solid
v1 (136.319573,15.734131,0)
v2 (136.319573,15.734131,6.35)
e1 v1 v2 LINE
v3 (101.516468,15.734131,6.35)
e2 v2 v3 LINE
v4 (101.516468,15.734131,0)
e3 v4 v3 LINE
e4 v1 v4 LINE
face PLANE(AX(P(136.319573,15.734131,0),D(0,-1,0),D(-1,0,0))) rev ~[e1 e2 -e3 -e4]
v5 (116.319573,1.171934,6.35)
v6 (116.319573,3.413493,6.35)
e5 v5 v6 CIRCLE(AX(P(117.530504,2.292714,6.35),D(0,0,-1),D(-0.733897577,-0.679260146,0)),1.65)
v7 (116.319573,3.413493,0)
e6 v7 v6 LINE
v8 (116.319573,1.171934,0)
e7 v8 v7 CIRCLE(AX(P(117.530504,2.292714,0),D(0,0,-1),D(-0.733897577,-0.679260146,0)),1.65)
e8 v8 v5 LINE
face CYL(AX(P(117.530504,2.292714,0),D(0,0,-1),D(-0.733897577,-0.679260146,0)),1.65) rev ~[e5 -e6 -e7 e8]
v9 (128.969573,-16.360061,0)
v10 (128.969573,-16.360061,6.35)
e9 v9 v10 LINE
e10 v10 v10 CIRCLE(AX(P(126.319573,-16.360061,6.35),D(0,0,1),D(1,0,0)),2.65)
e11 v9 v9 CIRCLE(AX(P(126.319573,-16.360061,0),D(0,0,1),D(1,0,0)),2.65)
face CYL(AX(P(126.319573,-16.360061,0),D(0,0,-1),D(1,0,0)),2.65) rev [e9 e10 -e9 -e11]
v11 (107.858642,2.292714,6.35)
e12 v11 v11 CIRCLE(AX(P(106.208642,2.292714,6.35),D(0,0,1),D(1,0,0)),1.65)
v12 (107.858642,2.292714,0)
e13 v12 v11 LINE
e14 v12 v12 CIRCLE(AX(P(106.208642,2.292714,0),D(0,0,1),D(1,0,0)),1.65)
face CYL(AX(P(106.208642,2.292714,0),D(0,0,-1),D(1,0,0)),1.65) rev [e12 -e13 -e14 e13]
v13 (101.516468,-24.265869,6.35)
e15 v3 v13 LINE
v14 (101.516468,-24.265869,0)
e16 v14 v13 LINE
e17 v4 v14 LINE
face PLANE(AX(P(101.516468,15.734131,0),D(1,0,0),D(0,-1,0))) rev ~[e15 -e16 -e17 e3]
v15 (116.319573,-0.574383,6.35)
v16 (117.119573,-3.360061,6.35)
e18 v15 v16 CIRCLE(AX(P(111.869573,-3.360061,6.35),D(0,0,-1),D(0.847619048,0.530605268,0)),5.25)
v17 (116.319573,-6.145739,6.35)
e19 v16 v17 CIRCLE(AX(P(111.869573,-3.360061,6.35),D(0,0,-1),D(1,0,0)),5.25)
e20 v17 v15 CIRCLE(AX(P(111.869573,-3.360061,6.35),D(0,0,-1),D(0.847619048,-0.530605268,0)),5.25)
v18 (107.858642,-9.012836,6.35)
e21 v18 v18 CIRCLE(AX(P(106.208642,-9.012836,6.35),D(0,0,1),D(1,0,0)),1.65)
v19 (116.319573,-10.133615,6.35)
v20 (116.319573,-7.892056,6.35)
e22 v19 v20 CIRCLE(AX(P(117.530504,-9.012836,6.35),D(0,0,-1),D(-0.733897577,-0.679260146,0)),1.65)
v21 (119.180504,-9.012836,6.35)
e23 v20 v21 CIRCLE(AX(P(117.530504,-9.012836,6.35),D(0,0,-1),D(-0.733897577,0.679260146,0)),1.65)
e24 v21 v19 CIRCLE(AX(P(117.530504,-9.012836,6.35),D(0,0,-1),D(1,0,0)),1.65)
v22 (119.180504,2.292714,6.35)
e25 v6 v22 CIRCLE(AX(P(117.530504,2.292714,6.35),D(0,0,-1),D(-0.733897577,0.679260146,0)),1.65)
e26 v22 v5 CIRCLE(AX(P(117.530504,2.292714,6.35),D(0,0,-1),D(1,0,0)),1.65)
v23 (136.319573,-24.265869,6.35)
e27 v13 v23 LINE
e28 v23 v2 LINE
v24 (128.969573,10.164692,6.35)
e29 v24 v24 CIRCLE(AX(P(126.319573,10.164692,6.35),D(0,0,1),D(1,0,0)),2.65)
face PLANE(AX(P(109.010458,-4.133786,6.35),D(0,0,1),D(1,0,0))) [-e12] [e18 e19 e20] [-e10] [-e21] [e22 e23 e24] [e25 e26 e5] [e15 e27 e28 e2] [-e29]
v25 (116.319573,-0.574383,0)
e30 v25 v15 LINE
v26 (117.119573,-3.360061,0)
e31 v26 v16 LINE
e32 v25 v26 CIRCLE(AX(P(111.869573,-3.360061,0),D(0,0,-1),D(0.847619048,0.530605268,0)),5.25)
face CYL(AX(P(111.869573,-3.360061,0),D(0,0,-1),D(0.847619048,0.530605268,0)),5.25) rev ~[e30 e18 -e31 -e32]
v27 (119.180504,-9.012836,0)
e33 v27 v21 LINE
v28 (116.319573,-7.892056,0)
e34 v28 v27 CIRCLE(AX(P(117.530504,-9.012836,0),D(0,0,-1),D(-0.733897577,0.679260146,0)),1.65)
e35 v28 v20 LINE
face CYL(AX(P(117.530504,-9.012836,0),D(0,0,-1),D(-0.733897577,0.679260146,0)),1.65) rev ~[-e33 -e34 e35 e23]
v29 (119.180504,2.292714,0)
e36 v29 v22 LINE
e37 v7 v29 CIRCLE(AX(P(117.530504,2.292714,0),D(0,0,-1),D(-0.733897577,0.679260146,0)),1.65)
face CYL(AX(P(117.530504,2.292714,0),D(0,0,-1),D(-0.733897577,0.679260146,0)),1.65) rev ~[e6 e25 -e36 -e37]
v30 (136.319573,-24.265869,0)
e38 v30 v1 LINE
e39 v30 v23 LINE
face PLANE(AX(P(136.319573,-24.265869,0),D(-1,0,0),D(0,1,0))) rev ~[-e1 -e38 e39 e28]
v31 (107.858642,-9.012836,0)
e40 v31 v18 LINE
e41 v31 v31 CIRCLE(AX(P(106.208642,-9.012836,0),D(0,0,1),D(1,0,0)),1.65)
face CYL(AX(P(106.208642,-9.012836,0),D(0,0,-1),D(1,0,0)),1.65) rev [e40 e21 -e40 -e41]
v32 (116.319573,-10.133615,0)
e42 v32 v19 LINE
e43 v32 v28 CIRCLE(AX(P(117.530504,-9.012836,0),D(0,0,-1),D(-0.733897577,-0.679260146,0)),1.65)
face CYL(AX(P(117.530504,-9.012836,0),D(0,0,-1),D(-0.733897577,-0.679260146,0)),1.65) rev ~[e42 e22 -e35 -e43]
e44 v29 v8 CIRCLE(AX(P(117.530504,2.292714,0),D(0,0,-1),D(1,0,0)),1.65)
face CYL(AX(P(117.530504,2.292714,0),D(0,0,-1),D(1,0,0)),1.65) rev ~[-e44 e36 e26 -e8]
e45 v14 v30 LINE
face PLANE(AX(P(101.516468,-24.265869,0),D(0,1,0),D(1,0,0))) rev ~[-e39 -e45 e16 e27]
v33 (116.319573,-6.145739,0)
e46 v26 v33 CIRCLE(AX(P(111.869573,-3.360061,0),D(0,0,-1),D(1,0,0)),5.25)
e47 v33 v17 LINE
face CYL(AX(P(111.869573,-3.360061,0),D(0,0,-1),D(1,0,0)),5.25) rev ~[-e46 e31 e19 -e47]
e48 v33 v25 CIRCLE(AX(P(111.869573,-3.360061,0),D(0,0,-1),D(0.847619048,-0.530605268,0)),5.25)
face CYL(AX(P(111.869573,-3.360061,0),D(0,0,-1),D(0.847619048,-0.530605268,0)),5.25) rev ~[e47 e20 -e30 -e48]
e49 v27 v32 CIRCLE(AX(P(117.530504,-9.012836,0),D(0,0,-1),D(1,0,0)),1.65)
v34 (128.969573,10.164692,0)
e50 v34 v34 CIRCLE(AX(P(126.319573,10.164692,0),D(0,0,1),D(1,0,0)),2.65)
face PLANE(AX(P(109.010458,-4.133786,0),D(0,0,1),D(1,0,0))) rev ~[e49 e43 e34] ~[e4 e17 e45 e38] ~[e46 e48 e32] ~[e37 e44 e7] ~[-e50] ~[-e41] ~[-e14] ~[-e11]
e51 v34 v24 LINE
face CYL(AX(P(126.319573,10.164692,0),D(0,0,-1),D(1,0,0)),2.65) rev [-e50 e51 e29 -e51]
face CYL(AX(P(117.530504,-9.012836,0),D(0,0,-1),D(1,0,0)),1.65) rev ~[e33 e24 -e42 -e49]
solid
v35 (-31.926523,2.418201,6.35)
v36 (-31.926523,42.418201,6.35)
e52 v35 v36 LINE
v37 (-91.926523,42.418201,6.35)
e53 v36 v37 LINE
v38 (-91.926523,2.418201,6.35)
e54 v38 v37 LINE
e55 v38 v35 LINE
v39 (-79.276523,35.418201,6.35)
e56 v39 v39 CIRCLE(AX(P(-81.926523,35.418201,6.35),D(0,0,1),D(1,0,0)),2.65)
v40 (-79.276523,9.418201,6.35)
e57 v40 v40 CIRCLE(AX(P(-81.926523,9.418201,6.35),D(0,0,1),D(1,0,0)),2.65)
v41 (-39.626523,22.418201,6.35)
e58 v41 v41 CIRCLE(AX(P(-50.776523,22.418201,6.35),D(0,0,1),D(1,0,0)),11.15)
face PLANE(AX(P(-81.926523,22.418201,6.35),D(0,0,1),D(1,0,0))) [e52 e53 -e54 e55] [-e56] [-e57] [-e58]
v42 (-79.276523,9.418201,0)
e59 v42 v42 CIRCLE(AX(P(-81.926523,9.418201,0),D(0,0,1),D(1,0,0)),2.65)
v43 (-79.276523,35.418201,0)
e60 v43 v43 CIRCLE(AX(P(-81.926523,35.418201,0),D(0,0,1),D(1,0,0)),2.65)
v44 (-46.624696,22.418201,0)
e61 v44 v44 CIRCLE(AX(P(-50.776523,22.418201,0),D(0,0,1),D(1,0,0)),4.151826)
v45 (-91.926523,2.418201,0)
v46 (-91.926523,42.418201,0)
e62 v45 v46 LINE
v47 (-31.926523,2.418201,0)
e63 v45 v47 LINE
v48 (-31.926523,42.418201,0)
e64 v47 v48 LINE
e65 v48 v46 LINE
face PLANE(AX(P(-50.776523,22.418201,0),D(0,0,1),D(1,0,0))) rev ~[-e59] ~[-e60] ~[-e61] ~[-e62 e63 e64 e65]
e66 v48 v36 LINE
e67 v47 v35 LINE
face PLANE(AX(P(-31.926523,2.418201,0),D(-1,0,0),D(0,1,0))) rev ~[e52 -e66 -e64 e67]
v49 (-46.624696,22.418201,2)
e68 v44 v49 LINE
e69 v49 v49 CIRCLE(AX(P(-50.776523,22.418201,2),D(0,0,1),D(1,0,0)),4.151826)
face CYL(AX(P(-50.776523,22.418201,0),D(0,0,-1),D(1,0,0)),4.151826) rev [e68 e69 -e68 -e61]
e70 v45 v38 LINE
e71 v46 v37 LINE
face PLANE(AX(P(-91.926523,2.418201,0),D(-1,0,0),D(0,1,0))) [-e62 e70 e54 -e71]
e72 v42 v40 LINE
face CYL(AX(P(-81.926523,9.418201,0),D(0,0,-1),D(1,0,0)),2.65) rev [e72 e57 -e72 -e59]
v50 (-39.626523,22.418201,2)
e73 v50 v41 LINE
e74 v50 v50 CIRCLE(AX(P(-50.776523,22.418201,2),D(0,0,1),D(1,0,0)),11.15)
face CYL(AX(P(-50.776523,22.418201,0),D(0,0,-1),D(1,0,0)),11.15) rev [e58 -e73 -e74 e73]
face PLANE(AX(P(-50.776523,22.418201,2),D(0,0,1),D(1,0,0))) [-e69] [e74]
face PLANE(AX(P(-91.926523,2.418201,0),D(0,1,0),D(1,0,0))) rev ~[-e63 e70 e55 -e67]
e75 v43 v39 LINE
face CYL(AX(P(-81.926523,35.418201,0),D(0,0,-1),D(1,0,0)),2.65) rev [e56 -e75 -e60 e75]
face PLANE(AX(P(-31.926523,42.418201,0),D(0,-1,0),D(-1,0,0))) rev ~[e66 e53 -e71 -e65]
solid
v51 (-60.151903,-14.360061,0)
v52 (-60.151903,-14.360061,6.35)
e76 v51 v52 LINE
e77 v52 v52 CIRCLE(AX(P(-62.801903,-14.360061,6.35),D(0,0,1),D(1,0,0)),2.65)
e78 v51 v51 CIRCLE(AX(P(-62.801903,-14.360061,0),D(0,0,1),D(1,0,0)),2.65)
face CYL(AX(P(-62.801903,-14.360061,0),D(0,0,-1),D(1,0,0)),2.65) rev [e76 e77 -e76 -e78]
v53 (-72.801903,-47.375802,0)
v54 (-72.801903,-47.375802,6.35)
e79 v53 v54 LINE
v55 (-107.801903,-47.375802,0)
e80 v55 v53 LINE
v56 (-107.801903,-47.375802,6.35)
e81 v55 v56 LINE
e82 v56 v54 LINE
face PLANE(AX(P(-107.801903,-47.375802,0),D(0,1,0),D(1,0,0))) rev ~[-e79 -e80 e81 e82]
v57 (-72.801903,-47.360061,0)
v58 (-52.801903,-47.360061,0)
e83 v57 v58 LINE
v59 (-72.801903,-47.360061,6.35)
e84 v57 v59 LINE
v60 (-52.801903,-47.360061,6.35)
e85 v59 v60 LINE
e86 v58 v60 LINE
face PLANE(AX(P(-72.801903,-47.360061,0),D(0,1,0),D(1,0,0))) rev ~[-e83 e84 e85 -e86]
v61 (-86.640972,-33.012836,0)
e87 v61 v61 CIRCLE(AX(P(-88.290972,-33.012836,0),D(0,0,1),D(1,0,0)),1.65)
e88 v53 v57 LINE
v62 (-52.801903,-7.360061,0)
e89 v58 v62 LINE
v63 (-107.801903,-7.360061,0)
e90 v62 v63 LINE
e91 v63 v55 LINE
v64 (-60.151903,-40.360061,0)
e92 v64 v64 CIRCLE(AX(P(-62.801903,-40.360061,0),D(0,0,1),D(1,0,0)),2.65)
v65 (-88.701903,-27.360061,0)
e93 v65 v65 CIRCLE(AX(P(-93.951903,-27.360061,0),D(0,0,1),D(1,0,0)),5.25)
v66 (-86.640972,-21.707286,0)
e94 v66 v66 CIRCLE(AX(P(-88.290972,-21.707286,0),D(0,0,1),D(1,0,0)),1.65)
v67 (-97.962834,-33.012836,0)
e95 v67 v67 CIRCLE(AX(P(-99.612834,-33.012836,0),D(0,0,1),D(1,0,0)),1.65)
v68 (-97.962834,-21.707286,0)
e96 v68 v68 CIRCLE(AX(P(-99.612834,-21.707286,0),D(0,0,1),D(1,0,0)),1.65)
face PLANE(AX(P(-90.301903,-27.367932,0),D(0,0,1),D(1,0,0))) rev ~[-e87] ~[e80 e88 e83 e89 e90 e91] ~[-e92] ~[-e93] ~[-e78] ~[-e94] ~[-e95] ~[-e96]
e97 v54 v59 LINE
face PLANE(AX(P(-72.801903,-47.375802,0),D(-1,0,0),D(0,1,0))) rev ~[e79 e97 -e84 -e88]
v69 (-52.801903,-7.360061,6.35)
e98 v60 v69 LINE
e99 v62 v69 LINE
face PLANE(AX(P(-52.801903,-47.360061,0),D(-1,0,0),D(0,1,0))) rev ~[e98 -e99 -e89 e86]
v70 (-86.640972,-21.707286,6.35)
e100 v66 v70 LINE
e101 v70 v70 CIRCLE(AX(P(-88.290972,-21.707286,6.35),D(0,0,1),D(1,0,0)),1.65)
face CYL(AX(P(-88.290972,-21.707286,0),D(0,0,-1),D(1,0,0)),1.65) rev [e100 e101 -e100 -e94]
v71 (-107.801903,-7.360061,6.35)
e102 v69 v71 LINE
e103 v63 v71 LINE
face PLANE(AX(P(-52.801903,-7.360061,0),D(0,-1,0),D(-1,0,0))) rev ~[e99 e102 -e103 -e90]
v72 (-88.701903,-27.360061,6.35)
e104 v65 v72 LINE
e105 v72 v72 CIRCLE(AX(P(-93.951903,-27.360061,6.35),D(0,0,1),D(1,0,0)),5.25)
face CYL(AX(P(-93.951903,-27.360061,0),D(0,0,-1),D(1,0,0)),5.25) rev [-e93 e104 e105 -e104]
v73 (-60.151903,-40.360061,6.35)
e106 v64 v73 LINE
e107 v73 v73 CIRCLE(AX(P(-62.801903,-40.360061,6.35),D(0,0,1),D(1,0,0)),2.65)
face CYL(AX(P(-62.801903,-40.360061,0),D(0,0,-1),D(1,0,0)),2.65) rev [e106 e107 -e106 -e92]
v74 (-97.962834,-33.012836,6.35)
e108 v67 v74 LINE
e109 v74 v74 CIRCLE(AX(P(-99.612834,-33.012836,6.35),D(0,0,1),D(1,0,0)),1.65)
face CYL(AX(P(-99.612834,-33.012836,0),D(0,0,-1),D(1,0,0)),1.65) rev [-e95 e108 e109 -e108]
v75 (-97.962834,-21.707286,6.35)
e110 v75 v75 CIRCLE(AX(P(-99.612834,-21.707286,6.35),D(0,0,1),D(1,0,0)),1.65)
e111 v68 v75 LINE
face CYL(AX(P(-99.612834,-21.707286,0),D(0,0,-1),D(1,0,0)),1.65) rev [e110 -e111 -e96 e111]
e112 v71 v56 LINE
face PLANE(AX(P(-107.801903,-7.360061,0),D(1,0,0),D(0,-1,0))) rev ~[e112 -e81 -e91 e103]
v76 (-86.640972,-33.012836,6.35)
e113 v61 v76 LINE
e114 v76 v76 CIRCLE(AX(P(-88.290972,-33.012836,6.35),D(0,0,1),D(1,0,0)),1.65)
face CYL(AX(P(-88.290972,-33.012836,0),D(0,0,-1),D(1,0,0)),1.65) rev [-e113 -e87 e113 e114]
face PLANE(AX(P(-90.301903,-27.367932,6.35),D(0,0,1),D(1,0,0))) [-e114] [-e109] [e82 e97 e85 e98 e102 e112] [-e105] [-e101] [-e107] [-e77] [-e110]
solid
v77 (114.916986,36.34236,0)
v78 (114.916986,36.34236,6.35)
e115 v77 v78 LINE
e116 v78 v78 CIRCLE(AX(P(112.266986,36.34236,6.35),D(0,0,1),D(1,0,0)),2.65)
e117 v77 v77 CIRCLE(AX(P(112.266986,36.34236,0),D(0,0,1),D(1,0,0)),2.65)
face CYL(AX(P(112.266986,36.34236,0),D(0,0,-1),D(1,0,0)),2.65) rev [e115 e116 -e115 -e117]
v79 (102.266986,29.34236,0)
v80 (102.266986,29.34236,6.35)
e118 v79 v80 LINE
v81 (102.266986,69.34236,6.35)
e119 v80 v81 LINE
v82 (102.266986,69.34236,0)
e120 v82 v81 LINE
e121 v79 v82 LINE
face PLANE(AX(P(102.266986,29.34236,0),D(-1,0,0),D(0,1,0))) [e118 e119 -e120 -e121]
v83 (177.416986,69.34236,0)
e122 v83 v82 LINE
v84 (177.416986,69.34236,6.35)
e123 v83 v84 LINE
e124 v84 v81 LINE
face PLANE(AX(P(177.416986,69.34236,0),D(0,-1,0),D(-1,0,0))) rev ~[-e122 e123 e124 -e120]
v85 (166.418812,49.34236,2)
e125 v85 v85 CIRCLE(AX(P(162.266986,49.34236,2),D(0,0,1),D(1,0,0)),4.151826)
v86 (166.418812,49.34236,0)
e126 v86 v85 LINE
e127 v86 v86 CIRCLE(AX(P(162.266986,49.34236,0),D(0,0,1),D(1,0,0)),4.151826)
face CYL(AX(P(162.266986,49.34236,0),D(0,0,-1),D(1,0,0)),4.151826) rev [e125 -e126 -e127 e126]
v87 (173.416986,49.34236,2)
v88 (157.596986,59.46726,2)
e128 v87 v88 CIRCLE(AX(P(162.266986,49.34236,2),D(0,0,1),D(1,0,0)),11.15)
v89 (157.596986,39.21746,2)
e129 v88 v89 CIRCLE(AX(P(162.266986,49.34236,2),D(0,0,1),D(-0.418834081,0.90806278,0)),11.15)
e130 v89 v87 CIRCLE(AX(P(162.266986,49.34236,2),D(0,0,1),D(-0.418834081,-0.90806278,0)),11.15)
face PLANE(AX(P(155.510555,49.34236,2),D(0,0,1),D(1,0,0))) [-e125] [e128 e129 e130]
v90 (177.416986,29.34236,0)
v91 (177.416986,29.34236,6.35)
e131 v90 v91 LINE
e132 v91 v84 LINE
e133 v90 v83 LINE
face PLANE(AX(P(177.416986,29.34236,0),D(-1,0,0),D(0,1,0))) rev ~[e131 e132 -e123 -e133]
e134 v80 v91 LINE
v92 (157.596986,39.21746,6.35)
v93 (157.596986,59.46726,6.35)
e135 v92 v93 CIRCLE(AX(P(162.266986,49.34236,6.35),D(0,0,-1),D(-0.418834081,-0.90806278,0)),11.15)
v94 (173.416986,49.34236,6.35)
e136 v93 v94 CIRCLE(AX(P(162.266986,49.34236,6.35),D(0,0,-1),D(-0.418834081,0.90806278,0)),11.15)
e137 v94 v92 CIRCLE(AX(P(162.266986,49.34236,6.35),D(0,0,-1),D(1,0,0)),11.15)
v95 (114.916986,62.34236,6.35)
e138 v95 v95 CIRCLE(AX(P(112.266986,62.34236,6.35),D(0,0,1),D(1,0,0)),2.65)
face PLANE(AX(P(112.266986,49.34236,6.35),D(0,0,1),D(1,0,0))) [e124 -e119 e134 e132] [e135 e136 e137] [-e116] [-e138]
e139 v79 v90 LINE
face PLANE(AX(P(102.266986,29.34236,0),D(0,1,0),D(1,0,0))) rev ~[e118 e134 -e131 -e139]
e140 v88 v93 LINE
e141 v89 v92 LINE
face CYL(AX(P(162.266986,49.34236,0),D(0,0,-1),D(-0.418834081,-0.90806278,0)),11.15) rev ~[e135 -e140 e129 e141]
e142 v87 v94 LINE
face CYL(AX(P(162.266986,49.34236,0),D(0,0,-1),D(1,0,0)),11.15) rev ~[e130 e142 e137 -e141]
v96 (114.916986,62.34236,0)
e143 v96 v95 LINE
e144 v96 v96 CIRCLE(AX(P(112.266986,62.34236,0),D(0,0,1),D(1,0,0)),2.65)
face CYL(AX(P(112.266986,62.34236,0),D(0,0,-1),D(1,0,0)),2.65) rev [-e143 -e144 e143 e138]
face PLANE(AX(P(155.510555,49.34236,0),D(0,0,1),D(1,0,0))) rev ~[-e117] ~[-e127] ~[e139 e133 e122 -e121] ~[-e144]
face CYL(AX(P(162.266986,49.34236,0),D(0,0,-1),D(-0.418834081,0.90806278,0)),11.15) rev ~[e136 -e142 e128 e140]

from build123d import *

# Parameters (mm, degrees)
F1_R     = 1.65
F1_R_2   = 5.25
F1_W     = 20
F1_H     = 40
F1_R_3   = 2.65
F2_DEPTH = 6.35
F0_W     = 20
F0_H     = 40
F0_R     = 2.65
F0_W_2   = 40
F0_R_2   = 11.15
F3_DEPTH = 6.35
F0_R_3   = 4.1518260948
F4_DEPTH = 2


# Not quite as in the source:
# - a feature names something its author has since deleted; it is built from what else it names


with BuildPart() as f2:
    # F1 (on Top) → F2 (new body)
    with BuildSketch(Plane.XY):
        Polygon((-72.8019029178, -47.3758022127), (-72.8019029178, -47.3600610539), (-72.8019029178, -7.3600610539), (-102.8019029178, -7.3600610539), (-107.8019029178, -7.3600610539), (-107.8019029178, -47.3758022127), (-102.8956038096, -47.3758022127), align=None)
        with Locations((-99.6128339202, -33.0128356103)):
            Circle(F1_R, mode=Mode.SUBTRACT)
        with Locations((-88.2909719153, -33.0128356103)):
            Circle(F1_R, mode=Mode.SUBTRACT)
        with Locations((-93.9519029178, -27.3600610539)):
            Circle(F1_R_2, mode=Mode.SUBTRACT)
        with Locations((-99.6128339202, -21.7072864974)):
            Circle(F1_R, mode=Mode.SUBTRACT)
        with Locations((-88.2909719153, -21.7072864974)):
            Circle(F1_R, mode=Mode.SUBTRACT)
        with Locations((-62.8019029178, -27.3600610539)):
            Rectangle(F1_W, F1_H)
        with Locations((-62.8019029178, -40.3600610539)):
            Circle(F1_R_3, mode=Mode.SUBTRACT)
        with Locations((-62.8019029178, -14.3600610539)):
            Circle(F1_R_3, mode=Mode.SUBTRACT)
    extrude(amount=F2_DEPTH)


with BuildPart() as f2b:
    # F1 (on Top) → F2, piece 2 (new body)
    with BuildSketch(Plane.XY):
        with BuildLine():
            Line((101.5164678693, -24.2658690363), (116.3195730567, -24.2658690363))
            Line((116.3195730567, -24.2658690363), (116.3195730567, -10.1336148514))
            ThreePointArc((116.3195730567, -10.1336148514), (115.8805040591, -9.0128356103), (116.3195730567, -7.8920563691))
            Line((116.3195730567, -7.8920563691), (116.3195730567, -6.1457387093))
            ThreePointArc((116.3195730567, -6.1457387093), (106.6195730567, -3.3600610539), (116.3195730567, -0.5743833984))
            Line((116.3195730567, -0.5743833984), (116.3195730567, 1.1719342614))
            ThreePointArc((116.3195730567, 1.1719342614), (115.8805040591, 2.2927135026), (116.3195730567, 3.4134927437))
            Line((116.3195730567, 3.4134927437), (116.3195730567, 15.7341309637))
            Line((116.3195730567, 15.7341309637), (101.5164678693, 15.7341309637))
            Line((101.5164678693, 15.7341309637), (101.5164678693, -24.2658690363))
        make_face()
        with Locations((106.2086420543, -9.0128356103)):
            Circle(F1_R, mode=Mode.SUBTRACT)
        with Locations((106.2086420543, 2.2927135026)):
            Circle(F1_R, mode=Mode.SUBTRACT)
        with BuildLine():
            Line((116.3195730567, -24.2658690363), (136.3195730567, -24.2658690363))
            Line((136.3195730567, -24.2658690363), (136.3195730567, 15.7341309637))
            Line((136.3195730567, 15.7341309637), (116.3195730567, 15.7341309637))
            Line((116.3195730567, 15.7341309637), (116.3195730567, 3.4134927437))
            ThreePointArc((116.3195730567, 3.4134927437), (118.1323611211, 3.8290299013), (119.1805040591, 2.2927135026))
            ThreePointArc((119.1805040591, 2.2927135026), (118.1323611211, 0.7563971038), (116.3195730567, 1.1719342614))
            Line((116.3195730567, 1.1719342614), (116.3195730567, -0.5743833984))
            ThreePointArc((116.3195730567, -0.5743833984), (116.9156111065, -1.9109233792), (117.1195730567, -3.3600610539))
            ThreePointArc((117.1195730567, -3.3600610539), (116.9156111065, -4.8091987285), (116.3195730567, -6.1457387093))
            Line((116.3195730567, -6.1457387093), (116.3195730567, -7.8920563691))
            ThreePointArc((116.3195730567, -7.8920563691), (118.1323611211, -7.4765192115), (119.1805040591, -9.0128356103))
            ThreePointArc((119.1805040591, -9.0128356103), (118.1323611211, -10.549152009), (116.3195730567, -10.1336148514))
            Line((116.3195730567, -10.1336148514), (116.3195730567, -24.2658690363))
        make_face()
        with Locations((126.3195730567, -16.3600610539)):
            Circle(F1_R_3, mode=Mode.SUBTRACT)
        with Locations((126.3195730567, 10.1646915369)):
            Circle(F1_R_3, mode=Mode.SUBTRACT)
    extrude(amount=F2_DEPTH)


with BuildPart() as f3:
    # F0 (on Top) → F3 (new body)
    with BuildSketch(Plane.XY):
        with Locations((-81.926522553, 22.4182014516)):
            Rectangle(F0_W, F0_H)
        with Locations((-81.926522553, 9.4182014516)):
            Circle(F0_R, mode=Mode.SUBTRACT)
        with Locations((-81.926522553, 35.4182014516)):
            Circle(F0_R, mode=Mode.SUBTRACT)
        with Locations((-51.926522553, 22.4182014516)):
            Rectangle(F0_W_2, F0_H)
        with Locations((-50.776522553, 22.4182014516)):
            Circle(F0_R_2, mode=Mode.SUBTRACT)
    extrude(amount=F3_DEPTH)

    # F0 (on Top) → F4 (join)
    with BuildSketch(Plane.XY):
        with Locations((-50.776522553, 22.4182014516)):
            Circle(F0_R_2)
        with Locations((-50.776522553, 22.4182014516)):
            Circle(F0_R_3, mode=Mode.SUBTRACT)
    extrude(amount=F4_DEPTH)


with BuildPart() as f3b:
    # F0 (on Top) → F3, piece 2 (new body)
    with BuildSketch(Plane.XY):
        with Locations((112.2669861317, 49.3423603475)):
            Rectangle(F0_W, F0_H)
        with Locations((112.2669861317, 36.3423603475)):
            Circle(F0_R, mode=Mode.SUBTRACT)
        with Locations((112.2669861317, 62.3423603475)):
            Circle(F0_R, mode=Mode.SUBTRACT)
        with BuildLine():
            Line((157.5969861317, 69.3423603475), (122.2669861317, 69.3423603475))
            Line((122.2669861317, 69.3423603475), (122.2669861317, 29.3423603475))
            Line((122.2669861317, 29.3423603475), (157.5969861317, 29.3423603475))
            Line((157.5969861317, 29.3423603475), (157.5969861317, 39.217460348))
            ThreePointArc((157.5969861317, 39.217460348), (151.1169861317, 49.3423603475), (157.5969861317, 59.467260347))
            Line((157.5969861317, 59.467260347), (157.5969861317, 69.3423603475))
        make_face()
        with BuildLine():
            Line((177.4169861317, 69.3423603475), (157.5969861317, 69.3423603475))
            Line((157.5969861317, 69.3423603475), (157.5969861317, 59.467260347))
            ThreePointArc((157.5969861317, 59.467260347), (168.2774769602, 58.7336595122), (173.4169861317, 49.3423603475))
            ThreePointArc((173.4169861317, 49.3423603475), (168.2774769602, 39.9510611829), (157.5969861317, 39.217460348))
            Line((157.5969861317, 39.217460348), (157.5969861317, 29.3423603475))
            Line((157.5969861317, 29.3423603475), (177.4169861317, 29.3423603475))
            Line((177.4169861317, 29.3423603475), (177.4169861317, 69.3423603475))
        make_face()
    extrude(amount=F3_DEPTH)

    # F0 (on Top) → F4, piece 2 (join)
    with BuildSketch(Plane.XY):
        with BuildLine():
            Line((157.5969861317, 39.217460348), (157.5969861317, 59.467260347))
            ThreePointArc((157.5969861317, 59.467260347), (151.1169861317, 49.3423603475), (157.5969861317, 39.217460348))
        make_face()
        with BuildLine():
            ThreePointArc((173.4169861317, 49.3423603475), (168.2774769602, 58.7336595122), (157.5969861317, 59.467260347))
            Line((157.5969861317, 59.467260347), (157.5969861317, 39.217460348))
            ThreePointArc((157.5969861317, 39.217460348), (168.2774769602, 39.9510611829), (173.4169861317, 49.3423603475))
        make_face()
        with Locations((162.2669861317, 49.3423603475)):
            Circle(F0_R_3, mode=Mode.SUBTRACT)
    extrude(amount=F4_DEPTH)


solid = Compound([f2.part, f2b.part, f3.part, f3b.part])
